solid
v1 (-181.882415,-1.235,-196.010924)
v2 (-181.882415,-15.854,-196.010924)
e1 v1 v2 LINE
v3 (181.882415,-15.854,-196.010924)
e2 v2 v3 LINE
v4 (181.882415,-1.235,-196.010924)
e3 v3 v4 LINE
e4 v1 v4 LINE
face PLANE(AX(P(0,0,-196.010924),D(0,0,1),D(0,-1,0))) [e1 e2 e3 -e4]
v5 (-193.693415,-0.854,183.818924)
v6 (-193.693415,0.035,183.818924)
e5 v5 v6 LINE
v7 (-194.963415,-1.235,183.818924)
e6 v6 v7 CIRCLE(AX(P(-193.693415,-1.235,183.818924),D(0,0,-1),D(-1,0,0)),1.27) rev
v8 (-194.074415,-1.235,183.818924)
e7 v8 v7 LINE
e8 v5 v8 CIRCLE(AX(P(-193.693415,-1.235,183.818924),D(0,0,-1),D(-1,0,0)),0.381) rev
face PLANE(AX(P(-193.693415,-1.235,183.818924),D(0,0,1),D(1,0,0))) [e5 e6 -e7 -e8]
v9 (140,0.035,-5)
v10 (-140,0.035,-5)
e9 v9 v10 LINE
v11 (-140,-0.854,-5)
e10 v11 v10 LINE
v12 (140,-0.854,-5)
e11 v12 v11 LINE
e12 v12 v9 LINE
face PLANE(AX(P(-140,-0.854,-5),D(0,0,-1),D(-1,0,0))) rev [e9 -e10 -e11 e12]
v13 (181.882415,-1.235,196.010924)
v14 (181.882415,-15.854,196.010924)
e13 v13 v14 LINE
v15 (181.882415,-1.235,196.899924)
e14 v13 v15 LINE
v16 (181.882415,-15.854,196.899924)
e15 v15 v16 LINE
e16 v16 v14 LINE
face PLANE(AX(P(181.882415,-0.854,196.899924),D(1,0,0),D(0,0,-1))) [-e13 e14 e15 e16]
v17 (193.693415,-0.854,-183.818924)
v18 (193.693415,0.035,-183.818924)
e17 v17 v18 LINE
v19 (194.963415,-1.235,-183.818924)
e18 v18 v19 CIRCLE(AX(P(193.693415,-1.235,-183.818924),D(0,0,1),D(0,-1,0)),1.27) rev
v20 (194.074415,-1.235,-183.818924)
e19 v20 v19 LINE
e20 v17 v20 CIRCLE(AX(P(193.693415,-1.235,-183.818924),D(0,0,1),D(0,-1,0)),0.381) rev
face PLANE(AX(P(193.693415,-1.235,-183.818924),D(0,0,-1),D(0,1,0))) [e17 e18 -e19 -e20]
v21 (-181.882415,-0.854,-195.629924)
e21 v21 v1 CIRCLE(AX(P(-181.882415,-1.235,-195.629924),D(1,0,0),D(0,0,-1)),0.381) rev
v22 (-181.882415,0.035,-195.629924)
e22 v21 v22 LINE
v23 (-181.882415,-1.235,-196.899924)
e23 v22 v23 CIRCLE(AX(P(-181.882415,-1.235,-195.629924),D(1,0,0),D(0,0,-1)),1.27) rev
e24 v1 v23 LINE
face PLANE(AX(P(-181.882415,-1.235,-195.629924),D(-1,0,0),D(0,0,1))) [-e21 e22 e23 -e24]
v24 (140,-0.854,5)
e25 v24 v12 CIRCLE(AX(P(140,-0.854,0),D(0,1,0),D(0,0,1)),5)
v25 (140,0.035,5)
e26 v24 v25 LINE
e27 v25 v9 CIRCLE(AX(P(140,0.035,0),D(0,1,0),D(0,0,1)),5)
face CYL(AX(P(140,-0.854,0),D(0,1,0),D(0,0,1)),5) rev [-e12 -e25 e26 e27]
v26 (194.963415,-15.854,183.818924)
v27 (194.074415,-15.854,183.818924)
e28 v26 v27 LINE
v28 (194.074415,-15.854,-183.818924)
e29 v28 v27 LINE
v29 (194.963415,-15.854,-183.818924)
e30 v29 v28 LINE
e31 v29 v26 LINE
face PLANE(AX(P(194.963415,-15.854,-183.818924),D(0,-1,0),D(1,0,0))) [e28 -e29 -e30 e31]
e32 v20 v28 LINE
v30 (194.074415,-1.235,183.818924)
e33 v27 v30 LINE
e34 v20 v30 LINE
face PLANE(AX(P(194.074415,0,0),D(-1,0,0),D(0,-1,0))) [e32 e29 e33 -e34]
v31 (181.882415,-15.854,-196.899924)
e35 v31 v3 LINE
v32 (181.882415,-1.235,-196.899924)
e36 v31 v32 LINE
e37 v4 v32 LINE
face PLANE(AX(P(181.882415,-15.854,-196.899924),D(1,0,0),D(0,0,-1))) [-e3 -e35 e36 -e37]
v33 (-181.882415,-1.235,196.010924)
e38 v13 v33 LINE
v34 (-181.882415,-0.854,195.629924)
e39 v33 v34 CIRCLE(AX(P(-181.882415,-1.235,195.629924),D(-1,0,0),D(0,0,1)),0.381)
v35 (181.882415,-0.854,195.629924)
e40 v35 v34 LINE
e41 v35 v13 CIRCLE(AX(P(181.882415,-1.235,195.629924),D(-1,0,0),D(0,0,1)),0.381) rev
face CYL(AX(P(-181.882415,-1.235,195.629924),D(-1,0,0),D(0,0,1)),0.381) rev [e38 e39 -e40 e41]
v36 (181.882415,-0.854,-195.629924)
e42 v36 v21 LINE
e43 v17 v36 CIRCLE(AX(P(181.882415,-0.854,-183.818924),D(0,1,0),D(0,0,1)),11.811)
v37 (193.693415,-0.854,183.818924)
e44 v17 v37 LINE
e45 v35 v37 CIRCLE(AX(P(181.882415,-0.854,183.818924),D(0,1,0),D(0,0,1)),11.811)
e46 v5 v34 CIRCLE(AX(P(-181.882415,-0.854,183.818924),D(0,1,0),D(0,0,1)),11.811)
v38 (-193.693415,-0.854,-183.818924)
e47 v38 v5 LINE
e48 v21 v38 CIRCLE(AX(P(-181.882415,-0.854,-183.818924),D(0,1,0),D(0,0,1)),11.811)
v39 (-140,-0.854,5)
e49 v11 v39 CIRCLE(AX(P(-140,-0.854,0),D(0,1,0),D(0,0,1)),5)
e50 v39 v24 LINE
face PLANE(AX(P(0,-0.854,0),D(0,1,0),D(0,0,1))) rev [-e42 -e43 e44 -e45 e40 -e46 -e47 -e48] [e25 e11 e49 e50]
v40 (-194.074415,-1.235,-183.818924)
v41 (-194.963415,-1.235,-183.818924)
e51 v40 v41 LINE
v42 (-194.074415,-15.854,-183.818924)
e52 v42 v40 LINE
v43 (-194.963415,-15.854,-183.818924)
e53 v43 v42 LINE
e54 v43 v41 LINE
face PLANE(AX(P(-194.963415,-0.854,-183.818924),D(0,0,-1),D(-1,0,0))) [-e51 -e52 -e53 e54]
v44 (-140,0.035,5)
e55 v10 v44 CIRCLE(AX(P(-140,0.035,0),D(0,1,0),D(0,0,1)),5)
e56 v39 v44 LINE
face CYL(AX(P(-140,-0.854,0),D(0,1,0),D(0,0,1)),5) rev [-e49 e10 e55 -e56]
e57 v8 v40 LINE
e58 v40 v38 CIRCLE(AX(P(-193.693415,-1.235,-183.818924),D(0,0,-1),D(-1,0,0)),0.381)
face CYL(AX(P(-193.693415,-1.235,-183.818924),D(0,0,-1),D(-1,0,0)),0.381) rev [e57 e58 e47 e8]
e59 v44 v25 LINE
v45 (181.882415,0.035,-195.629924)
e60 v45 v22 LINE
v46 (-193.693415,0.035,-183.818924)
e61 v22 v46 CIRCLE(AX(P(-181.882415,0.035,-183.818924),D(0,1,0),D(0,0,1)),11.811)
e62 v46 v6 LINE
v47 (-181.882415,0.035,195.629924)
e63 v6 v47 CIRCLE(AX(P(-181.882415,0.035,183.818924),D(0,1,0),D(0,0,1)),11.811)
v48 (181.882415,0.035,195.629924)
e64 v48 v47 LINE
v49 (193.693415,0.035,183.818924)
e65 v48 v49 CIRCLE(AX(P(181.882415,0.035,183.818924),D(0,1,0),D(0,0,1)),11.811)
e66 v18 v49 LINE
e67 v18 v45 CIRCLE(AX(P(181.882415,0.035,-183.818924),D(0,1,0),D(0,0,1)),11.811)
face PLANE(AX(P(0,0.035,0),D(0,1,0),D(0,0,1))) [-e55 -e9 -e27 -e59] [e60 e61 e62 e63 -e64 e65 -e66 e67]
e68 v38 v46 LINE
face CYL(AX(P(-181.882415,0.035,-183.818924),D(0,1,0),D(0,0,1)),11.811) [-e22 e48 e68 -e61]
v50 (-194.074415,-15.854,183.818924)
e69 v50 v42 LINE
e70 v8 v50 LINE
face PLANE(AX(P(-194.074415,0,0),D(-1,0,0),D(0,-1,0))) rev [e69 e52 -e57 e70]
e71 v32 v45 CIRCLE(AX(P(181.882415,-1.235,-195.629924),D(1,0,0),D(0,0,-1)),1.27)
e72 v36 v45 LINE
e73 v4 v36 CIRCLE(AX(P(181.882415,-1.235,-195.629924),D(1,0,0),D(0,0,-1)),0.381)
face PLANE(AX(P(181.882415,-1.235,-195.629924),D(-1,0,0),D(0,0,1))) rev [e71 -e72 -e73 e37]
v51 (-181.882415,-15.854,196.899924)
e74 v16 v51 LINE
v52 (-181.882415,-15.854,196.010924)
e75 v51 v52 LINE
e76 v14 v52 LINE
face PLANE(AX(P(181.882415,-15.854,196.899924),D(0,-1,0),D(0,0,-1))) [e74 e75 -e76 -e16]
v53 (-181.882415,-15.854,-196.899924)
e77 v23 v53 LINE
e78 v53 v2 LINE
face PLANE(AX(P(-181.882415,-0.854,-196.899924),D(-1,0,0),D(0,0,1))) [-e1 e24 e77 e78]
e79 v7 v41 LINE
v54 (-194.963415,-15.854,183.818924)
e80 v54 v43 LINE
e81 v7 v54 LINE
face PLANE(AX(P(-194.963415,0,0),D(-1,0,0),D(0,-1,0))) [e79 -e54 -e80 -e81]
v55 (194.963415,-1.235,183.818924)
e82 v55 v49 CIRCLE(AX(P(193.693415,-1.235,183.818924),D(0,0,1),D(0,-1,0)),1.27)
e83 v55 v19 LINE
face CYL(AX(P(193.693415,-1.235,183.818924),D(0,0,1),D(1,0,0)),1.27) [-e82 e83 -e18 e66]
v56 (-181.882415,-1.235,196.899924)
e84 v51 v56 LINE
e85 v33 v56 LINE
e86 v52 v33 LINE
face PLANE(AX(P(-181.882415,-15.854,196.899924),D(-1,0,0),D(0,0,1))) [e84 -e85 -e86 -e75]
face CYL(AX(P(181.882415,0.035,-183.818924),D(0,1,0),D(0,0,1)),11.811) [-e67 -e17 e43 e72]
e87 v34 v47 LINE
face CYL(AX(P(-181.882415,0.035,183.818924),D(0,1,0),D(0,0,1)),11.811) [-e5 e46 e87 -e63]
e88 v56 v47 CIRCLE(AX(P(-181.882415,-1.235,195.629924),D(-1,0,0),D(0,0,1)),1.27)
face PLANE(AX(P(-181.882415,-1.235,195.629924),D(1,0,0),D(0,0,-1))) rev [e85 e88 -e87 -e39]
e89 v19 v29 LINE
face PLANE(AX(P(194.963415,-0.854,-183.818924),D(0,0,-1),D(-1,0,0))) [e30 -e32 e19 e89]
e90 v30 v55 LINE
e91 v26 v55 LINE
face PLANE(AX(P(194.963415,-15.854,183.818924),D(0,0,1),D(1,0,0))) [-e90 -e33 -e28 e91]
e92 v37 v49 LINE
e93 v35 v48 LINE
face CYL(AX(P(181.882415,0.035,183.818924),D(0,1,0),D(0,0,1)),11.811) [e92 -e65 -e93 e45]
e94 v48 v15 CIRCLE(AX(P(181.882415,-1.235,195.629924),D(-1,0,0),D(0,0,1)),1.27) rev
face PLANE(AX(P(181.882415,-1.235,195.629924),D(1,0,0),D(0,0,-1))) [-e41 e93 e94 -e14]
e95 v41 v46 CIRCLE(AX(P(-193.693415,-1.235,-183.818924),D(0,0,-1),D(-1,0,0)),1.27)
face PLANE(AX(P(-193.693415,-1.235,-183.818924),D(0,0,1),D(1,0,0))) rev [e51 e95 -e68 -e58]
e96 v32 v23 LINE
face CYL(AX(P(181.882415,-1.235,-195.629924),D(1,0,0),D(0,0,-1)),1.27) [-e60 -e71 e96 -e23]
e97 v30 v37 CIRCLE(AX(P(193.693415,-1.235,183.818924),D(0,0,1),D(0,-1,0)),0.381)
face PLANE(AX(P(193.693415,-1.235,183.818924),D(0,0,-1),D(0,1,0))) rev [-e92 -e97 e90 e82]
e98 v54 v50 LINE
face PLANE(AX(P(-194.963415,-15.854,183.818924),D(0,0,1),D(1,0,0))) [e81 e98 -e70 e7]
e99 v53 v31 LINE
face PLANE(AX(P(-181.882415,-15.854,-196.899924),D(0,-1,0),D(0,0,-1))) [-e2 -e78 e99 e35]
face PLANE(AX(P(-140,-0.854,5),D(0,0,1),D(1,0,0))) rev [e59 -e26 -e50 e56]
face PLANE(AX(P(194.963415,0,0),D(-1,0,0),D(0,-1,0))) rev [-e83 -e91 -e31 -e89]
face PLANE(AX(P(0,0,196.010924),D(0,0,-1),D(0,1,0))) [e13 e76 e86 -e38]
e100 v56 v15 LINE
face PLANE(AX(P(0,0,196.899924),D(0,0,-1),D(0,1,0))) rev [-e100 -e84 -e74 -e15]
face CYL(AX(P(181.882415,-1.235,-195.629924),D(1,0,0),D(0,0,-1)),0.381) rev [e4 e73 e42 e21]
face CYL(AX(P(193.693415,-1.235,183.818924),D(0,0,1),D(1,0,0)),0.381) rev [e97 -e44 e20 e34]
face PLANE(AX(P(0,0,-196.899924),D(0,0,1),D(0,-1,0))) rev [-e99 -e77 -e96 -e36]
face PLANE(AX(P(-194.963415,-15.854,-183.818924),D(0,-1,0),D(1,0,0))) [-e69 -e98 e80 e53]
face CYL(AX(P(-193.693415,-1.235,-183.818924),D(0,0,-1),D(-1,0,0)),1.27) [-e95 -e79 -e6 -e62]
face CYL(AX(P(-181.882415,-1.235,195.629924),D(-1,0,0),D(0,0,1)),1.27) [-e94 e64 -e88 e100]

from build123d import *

# Parameters (mm, degrees)
SKETCH1_W                 = 387.38683
SKETCH1_H                 = 391.2598474
BOSS_EXTRUDE1_DEPTH       = 0.035
FILLET1_R                 = 11.811
CONVERT_SOLID1_START      = -0.854
CONVERT_SOLID1_DEPTH      = 0.854
CUT_EXTRUDE1_DEPTH        = 0.889
EDGE_FLANGE1_DEPTH        = 367.6378474
EDGE_FLANGE1_BEND_DEPTH   = 363.76483
EDGE_FLANGE1_BEND_2_DEPTH = 367.6378474
EDGE_FLANGE1_BEND_3_DEPTH = 363.76483


# Read off the part's stored shape, not the designer's step: Convert-Solid1
# Sheet-metal steps are written as plain solids
with BuildPart() as part:
    # Sketch1 → Boss-Extrude1 (new body)
    with BuildSketch(Plane(origin=(0, 0, 0), x_dir=(1, 0, 0), z_dir=(0, 1, 0))):
        Rectangle(SKETCH1_W, SKETCH1_H)
    extrude(amount=BOSS_EXTRUDE1_DEPTH)

    # Fillet1
    fillet1_edges = [part.edges().sort_by_distance(p)[0] for p in [
        (193.693415, 0.0175, -195.6299237),
        (193.693415, 0.0175, 195.6299237),
        (-193.693415, 0.0175, 195.6299237),
        (-193.693415, 0.0175, -195.6299237),
    ]]
    fillet(fillet1_edges, radius=FILLET1_R)

    # Convert-Solid1 outline → Convert-Solid1 (add)
    with BuildSketch(Plane(origin=(0, 0, 0), x_dir=(1, 0, 0), z_dir=(0, 1, 0)).offset(CONVERT_SOLID1_START)):
        with BuildLine():
            ThreePointArc((193.693415, 183.8189237), (190.234053193, 192.170561893), (181.882415, 195.6299237))
            Line((181.882415, 195.6299237), (-181.882415, 195.6299237))
            ThreePointArc((-181.882415, 195.6299237), (-190.234053193, 192.170561893), (-193.693415, 183.8189237))
            Line((-193.693415, 183.8189237), (-193.693415, -183.8189237))
            ThreePointArc((-193.693415, -183.8189237), (-190.234053193, -192.170561893), (-181.882415, -195.6299237))
            Line((-181.882415, -195.6299237), (181.882415, -195.6299237))
            ThreePointArc((181.882415, -195.6299237), (190.234053193, -192.170561893), (193.693415, -183.8189237))
            Line((193.693415, -183.8189237), (193.693415, 183.8189237))
        make_face()
    extrude(amount=CONVERT_SOLID1_DEPTH)

    # Sketch2 → Cut-Extrude1 (cut)
    with BuildSketch(Plane(origin=(0, 0.035, 0), x_dir=(1, 0, 0), z_dir=(0, 1, 0))):
        with BuildLine():
            Line((-140, 5), (140, 5))
            ThreePointArc((140, 5), (145, 0), (140, -5))
            Line((140, -5), (-140, -5))
            ThreePointArc((-140, -5), (-145, 0), (-140, 5))
        make_face()
    extrude(amount=-CUT_EXTRUDE1_DEPTH, mode=Mode.SUBTRACT)

    # Edge-Flange1 section (across the edge) → Edge-Flange1 (add)
    with BuildSketch(Plane(origin=(-194.074415, -0.854, 183.8189237), x_dir=(1, 0, 0), z_dir=(0, 0, -1))):
        with BuildLine():
            Line((-0.889, 0.381), (-0.889, 15))
            Line((-0.889, 15), (0, 15))
            Line((0, 15), (0, 0.381))
            ThreePointArc((0, 0.381), (0.111592316, 0.111592316), (0.381, 0))
            Line((0.381, 0), (0.381, -0.889))
            ThreePointArc((0.381, -0.889), (-0.517025612, -0.517025612), (-0.889, 0.381))
        make_face()
    extrude(amount=EDGE_FLANGE1_DEPTH)

    # Edge-Flange1 section 2 (across the edge) → Edge-Flange1 bend (add)
    with BuildSketch(Plane(origin=(181.882415, -0.854, 196.0109237), x_dir=(0, 0, -1), z_dir=(-1, 0, 0))):
        with BuildLine():
            Line((-0.889, 0.381), (-0.889, 15))
            Line((-0.889, 15), (0, 15))
            Line((0, 15), (0, 0.381))
            ThreePointArc((0, 0.381), (0.111592316, 0.111592316), (0.381, 0))
            Line((0.381, 0), (0.381, -0.889))
            ThreePointArc((0.381, -0.889), (-0.517025612, -0.517025612), (-0.889, 0.381))
        make_face()
    extrude(amount=EDGE_FLANGE1_BEND_DEPTH)

    # Edge-Flange1 section 3 (across the edge) → Edge-Flange1 bend 2 (add)
    with BuildSketch(Plane(origin=(194.074415, -0.854, -183.8189237), x_dir=(-1, 0, 0), z_dir=(0, 0, 1))):
        with BuildLine():
            Line((-0.889, 0.381), (-0.889, 15))
            Line((-0.889, 15), (0, 15))
            Line((0, 15), (0, 0.381))
            ThreePointArc((0, 0.381), (0.111592316, 0.111592316), (0.381, 0))
            Line((0.381, 0), (0.381, -0.889))
            ThreePointArc((0.381, -0.889), (-0.517025612, -0.517025612), (-0.889, 0.381))
        make_face()
    extrude(amount=EDGE_FLANGE1_BEND_2_DEPTH)

    # Edge-Flange1 section 4 (across the edge) → Edge-Flange1 bend 3 (add)
    with BuildSketch(Plane(origin=(-181.882415, -0.854, -196.0109237), x_dir=(0, 0, 1), z_dir=(1, 0, 0))):
        with BuildLine():
            Line((-0.889, 0.381), (-0.889, 15))
            Line((-0.889, 15), (0, 15))
            Line((0, 15), (0, 0.381))
            ThreePointArc((0, 0.381), (0.111592316, 0.111592316), (0.381, 0))
            Line((0.381, 0), (0.381, -0.889))
            ThreePointArc((0.381, -0.889), (-0.517025612, -0.517025612), (-0.889, 0.381))
        make_face()
    extrude(amount=EDGE_FLANGE1_BEND_3_DEPTH)


solid = part.part
